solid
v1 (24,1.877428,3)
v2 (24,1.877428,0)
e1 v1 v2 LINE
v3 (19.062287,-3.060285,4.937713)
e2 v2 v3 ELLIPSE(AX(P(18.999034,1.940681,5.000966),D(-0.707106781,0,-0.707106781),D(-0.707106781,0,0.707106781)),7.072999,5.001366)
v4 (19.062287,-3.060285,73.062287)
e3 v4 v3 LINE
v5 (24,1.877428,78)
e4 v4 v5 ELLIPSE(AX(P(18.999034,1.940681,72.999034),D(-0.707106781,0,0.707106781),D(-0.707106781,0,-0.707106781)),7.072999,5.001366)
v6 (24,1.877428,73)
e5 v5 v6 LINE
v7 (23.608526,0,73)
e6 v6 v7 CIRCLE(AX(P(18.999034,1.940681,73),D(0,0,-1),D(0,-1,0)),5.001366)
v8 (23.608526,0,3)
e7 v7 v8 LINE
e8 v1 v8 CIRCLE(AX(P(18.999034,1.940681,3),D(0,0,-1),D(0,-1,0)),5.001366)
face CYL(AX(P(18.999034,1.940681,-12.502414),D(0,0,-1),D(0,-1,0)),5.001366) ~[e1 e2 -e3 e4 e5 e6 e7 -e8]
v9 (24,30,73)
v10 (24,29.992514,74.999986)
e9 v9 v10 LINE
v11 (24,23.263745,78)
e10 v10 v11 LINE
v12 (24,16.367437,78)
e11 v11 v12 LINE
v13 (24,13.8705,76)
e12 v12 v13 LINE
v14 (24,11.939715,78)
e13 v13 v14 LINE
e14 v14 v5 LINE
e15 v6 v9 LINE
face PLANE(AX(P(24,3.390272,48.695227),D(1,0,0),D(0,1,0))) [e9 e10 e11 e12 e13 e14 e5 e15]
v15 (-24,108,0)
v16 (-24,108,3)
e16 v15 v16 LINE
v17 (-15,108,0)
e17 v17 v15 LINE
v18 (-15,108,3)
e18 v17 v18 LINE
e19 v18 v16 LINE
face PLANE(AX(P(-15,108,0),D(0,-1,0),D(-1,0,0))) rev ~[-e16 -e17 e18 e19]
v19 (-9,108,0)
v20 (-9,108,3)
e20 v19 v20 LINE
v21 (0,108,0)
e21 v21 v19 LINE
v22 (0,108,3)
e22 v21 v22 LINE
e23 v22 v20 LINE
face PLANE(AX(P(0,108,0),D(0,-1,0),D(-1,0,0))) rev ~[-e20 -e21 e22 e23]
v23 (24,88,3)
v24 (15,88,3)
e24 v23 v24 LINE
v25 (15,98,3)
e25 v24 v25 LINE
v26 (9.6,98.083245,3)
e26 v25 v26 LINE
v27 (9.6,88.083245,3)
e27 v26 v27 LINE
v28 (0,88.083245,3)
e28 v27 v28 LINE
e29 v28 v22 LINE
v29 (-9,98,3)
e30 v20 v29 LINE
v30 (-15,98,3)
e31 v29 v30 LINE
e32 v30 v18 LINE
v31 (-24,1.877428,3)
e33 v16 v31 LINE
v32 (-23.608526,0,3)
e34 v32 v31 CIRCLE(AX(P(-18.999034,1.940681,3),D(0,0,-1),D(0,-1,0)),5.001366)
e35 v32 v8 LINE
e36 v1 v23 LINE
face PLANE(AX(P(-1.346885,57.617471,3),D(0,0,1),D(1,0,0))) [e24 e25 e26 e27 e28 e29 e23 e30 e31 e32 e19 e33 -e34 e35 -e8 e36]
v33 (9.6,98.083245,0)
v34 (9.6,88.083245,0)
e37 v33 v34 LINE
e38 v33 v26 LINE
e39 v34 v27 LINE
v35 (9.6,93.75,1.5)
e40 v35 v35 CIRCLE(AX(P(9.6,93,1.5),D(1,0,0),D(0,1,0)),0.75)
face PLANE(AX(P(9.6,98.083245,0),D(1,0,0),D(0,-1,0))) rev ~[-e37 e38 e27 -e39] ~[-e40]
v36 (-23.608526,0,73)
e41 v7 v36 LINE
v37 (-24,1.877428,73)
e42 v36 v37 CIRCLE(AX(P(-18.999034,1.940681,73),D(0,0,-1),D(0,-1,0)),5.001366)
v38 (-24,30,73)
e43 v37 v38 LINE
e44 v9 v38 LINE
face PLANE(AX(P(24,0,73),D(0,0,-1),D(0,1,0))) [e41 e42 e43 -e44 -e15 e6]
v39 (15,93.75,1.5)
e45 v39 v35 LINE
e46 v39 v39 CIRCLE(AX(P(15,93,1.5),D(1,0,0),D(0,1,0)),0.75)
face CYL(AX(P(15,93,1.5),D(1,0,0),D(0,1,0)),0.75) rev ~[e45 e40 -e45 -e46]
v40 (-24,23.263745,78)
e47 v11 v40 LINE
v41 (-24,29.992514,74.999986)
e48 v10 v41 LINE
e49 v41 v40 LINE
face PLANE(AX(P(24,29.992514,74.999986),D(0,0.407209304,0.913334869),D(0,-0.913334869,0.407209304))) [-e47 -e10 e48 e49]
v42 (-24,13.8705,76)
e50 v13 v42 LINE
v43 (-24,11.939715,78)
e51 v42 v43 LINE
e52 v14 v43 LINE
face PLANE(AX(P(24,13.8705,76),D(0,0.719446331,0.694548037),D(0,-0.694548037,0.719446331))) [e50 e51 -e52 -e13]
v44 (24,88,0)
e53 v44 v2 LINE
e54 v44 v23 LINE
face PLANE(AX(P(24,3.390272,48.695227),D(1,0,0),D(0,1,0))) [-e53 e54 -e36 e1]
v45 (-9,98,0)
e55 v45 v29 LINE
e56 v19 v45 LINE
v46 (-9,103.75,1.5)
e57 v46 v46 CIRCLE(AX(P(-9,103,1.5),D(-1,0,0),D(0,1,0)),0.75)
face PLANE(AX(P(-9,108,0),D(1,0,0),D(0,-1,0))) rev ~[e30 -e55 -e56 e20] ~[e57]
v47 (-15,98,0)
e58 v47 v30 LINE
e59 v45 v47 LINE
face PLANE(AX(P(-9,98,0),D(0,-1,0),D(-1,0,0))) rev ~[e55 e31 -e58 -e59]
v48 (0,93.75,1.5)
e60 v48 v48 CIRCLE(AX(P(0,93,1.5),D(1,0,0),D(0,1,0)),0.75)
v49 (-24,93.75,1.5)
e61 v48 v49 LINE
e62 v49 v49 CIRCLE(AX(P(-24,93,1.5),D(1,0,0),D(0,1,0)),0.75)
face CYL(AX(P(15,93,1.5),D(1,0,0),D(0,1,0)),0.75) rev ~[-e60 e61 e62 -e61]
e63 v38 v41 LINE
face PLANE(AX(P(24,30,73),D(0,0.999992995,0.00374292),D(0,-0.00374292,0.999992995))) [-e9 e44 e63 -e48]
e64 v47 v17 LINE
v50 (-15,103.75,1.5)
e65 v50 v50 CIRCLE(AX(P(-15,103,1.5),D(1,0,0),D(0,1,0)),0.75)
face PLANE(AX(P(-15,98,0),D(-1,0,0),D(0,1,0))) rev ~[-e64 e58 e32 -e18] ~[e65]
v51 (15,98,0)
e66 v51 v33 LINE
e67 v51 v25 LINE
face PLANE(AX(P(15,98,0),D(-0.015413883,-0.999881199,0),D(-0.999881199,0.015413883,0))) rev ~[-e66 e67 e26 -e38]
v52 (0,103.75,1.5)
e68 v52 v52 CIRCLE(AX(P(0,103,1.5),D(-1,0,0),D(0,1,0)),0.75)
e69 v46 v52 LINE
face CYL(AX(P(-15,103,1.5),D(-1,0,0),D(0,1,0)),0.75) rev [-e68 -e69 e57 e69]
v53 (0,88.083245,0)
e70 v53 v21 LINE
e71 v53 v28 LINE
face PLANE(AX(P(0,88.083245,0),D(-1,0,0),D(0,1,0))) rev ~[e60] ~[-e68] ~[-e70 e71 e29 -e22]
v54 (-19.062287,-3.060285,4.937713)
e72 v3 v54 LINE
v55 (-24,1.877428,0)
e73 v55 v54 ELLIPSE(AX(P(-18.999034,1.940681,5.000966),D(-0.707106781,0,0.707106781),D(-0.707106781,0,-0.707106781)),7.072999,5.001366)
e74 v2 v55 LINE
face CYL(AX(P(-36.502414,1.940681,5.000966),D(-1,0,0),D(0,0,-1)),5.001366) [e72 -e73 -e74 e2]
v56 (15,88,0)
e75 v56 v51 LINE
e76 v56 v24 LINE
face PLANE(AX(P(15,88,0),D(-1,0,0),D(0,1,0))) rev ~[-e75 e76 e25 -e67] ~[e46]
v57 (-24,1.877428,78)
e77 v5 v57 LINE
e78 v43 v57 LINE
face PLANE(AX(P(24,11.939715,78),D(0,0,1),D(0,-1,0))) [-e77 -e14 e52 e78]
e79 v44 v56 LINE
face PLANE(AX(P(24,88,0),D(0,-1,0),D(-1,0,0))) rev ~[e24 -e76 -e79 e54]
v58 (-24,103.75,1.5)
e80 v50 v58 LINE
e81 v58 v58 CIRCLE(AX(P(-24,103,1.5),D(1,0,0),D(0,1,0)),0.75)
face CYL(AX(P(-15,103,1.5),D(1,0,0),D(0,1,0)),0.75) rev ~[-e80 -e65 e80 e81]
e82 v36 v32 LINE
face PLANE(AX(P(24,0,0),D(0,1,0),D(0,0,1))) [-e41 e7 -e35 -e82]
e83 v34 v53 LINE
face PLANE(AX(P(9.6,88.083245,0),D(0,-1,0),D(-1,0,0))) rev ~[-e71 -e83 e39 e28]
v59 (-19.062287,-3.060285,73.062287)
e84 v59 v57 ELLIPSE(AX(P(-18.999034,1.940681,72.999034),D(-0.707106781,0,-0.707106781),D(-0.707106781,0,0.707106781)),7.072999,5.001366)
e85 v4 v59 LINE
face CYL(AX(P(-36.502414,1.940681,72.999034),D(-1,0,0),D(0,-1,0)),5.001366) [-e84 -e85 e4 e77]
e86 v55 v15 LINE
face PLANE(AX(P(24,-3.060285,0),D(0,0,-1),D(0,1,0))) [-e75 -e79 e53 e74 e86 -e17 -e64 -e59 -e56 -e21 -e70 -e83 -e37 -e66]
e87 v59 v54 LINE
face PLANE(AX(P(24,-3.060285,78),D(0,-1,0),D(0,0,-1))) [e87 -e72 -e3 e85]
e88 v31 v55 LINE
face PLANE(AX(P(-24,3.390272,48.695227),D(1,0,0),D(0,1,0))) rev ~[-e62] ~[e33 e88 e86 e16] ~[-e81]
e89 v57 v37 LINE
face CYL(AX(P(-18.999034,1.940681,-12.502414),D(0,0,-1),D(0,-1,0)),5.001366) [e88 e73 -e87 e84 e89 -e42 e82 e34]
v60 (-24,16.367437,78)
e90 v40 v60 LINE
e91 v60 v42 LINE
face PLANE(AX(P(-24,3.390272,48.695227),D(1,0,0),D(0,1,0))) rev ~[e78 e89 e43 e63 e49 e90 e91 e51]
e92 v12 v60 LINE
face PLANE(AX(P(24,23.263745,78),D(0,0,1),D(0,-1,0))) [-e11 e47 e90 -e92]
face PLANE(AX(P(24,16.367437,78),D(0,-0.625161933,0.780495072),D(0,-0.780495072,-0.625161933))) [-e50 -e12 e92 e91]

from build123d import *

# Parameters (mm, degrees)
F1_DEPTH      = 3
F3_DEPTH      = 48
F4_T1_DEPTH   = 73.0048285071
F4_T3_DEPTH   = 103.0048285071
F5_R          = 0.75
F6_DEPTH      = 39.001
F7_R          = 0.75
F8_DEPTH      = 9.001
F8_DEPTH_BACK = 39.001


# Not quite as in the source:
# - a fillet or chamfer that OpenCascade refuses, or shapes differently, is made with other operations: its cross-section is extruded or revolved along the edge and cut away or added


with BuildPart() as f1:
    # F0 (on Top) → F1 (new body)
    with BuildSketch(Plane.XY):
        Polygon((-24, 0), (0, 0), (24, 0), (24, 88), (15, 88), (15, 98), (9.6, 98.0832448602), (9.6, 88.0832448602), (0, 88.0832448602), (0, 108), (-9, 108), (-9, 98), (-15, 98), (-15, 108), (-24, 108), align=None)
    extrude(amount=F1_DEPTH)

    # F2 (on face) → F3 (join)
    with BuildSketch(Plane.YZ.offset(24)):
        Polygon((-3.0602848184, 0), (0, 0), (0, 73), (30, 73), (29.9925141591, 74.9999859905), (23.2637450099, 78), (16.367437318, 78), (13.8705000281, 76), (11.9397151816, 78), (-3.0602848184, 78), align=None)
    extrude(amount=-F3_DEPTH)

    # F4: fillet of radius 5 on 6 edges, made by hand

    # F4_s2 → F4_t1 (cut)
    with BuildSketch(Plane.YZ.offset(-36.5024142536)):
        with BuildLine():
            ThreePointArc((-3.0606848184, 72.9990343146), (-1.5958187243, 76.5355339059), (1.9406808671, 78.0004))
            Line((1.9406808671, 78.0004), (1.9406808671, 78.5005365685))
            ThreePointArc((1.9406808671, 78.5005365685), (-0.5598019756, 78.5001365685), (-3.0602848184, 78.5001365685))
            Line((-3.0602848184, 78.5001365685), (-3.5604213869, 78))
            ThreePointArc((-3.5604213869, 78), (-3.5604213869, 75.4995171573), (-3.5608213869, 72.9990343146))
            Line((-3.5608213869, 72.9990343146), (-3.0606848184, 72.9990343146))
        make_face()
        with BuildLine():
            ThreePointArc((1.9406808671, -0.0004), (-1.5958187243, 1.4644660941), (-3.0606848184, 5.0009656854))
            Line((-3.0606848184, 5.0009656854), (-3.5608213869, 5.0009656854))
            ThreePointArc((-3.5608213869, 5.0009656854), (-3.5604213869, 2.5004828427), (-3.5604213869, 0))
            Line((-3.5604213869, 0), (-3.0602848184, -0.5001365685))
            ThreePointArc((-3.0602848184, -0.5001365685), (-0.5598019756, -0.5001365685), (1.9406808671, -0.5005365685))
            Line((1.9406808671, -0.5005365685), (1.9406808671, -0.0004))
        make_face()
    extrude(amount=F4_T1_DEPTH, mode=Mode.SUBTRACT)

    # F4_s4 → F4_t3 (cut)
    with BuildSketch(Plane.XY.offset(-12.5024142536)):
        with BuildLine():
            ThreePointArc((18.9990343146, -3.0606848184), (22.5355339059, -1.5958187243), (24.0004, 1.9406808671))
            Line((24.0004, 1.9406808671), (24.5005365685, 1.9406808671))
            ThreePointArc((24.5005365685, 1.9406808671), (24.5001365685, -0.5598019756), (24.5001365685, -3.0602848184))
            Line((24.5001365685, -3.0602848184), (24, -3.5604213869))
            ThreePointArc((24, -3.5604213869), (21.4995171573, -3.5604213869), (18.9990343146, -3.5608213869))
            Line((18.9990343146, -3.5608213869), (18.9990343146, -3.0606848184))
        make_face()
        with BuildLine():
            ThreePointArc((-18.9990343146, -3.0606848184), (-22.5355339059, -1.5958187243), (-24.0004, 1.9406808671))
            Line((-24.0004, 1.9406808671), (-24.5005365685, 1.9406808671))
            ThreePointArc((-24.5005365685, 1.9406808671), (-24.5001365685, -0.5598019756), (-24.5001365685, -3.0602848184))
            Line((-24.5001365685, -3.0602848184), (-24, -3.5604213869))
            ThreePointArc((-24, -3.5604213869), (-21.4995171573, -3.5604213869), (-18.9990343146, -3.5608213869))
            Line((-18.9990343146, -3.5608213869), (-18.9990343146, -3.0606848184))
        make_face()
    extrude(amount=F4_T3_DEPTH, mode=Mode.SUBTRACT)

    # F5 (on face) → F6 (cut, through all)
    with BuildSketch(Plane.YZ.offset(15)):
        with Locations((93, 1.5)):
            Circle(F5_R)
    extrude(amount=-F6_DEPTH, mode=Mode.SUBTRACT)

    # F7 (on face) → F8 (cut, two sides)
    with BuildSketch(Plane.YZ.offset(-15)) as f8_sk:
        with Locations((103, 1.5)):
            Circle(F7_R)
    extrude(amount=-F8_DEPTH, mode=Mode.SUBTRACT)
    extrude(f8_sk.sketch, amount=F8_DEPTH_BACK, mode=Mode.SUBTRACT)


solid = f1.part
